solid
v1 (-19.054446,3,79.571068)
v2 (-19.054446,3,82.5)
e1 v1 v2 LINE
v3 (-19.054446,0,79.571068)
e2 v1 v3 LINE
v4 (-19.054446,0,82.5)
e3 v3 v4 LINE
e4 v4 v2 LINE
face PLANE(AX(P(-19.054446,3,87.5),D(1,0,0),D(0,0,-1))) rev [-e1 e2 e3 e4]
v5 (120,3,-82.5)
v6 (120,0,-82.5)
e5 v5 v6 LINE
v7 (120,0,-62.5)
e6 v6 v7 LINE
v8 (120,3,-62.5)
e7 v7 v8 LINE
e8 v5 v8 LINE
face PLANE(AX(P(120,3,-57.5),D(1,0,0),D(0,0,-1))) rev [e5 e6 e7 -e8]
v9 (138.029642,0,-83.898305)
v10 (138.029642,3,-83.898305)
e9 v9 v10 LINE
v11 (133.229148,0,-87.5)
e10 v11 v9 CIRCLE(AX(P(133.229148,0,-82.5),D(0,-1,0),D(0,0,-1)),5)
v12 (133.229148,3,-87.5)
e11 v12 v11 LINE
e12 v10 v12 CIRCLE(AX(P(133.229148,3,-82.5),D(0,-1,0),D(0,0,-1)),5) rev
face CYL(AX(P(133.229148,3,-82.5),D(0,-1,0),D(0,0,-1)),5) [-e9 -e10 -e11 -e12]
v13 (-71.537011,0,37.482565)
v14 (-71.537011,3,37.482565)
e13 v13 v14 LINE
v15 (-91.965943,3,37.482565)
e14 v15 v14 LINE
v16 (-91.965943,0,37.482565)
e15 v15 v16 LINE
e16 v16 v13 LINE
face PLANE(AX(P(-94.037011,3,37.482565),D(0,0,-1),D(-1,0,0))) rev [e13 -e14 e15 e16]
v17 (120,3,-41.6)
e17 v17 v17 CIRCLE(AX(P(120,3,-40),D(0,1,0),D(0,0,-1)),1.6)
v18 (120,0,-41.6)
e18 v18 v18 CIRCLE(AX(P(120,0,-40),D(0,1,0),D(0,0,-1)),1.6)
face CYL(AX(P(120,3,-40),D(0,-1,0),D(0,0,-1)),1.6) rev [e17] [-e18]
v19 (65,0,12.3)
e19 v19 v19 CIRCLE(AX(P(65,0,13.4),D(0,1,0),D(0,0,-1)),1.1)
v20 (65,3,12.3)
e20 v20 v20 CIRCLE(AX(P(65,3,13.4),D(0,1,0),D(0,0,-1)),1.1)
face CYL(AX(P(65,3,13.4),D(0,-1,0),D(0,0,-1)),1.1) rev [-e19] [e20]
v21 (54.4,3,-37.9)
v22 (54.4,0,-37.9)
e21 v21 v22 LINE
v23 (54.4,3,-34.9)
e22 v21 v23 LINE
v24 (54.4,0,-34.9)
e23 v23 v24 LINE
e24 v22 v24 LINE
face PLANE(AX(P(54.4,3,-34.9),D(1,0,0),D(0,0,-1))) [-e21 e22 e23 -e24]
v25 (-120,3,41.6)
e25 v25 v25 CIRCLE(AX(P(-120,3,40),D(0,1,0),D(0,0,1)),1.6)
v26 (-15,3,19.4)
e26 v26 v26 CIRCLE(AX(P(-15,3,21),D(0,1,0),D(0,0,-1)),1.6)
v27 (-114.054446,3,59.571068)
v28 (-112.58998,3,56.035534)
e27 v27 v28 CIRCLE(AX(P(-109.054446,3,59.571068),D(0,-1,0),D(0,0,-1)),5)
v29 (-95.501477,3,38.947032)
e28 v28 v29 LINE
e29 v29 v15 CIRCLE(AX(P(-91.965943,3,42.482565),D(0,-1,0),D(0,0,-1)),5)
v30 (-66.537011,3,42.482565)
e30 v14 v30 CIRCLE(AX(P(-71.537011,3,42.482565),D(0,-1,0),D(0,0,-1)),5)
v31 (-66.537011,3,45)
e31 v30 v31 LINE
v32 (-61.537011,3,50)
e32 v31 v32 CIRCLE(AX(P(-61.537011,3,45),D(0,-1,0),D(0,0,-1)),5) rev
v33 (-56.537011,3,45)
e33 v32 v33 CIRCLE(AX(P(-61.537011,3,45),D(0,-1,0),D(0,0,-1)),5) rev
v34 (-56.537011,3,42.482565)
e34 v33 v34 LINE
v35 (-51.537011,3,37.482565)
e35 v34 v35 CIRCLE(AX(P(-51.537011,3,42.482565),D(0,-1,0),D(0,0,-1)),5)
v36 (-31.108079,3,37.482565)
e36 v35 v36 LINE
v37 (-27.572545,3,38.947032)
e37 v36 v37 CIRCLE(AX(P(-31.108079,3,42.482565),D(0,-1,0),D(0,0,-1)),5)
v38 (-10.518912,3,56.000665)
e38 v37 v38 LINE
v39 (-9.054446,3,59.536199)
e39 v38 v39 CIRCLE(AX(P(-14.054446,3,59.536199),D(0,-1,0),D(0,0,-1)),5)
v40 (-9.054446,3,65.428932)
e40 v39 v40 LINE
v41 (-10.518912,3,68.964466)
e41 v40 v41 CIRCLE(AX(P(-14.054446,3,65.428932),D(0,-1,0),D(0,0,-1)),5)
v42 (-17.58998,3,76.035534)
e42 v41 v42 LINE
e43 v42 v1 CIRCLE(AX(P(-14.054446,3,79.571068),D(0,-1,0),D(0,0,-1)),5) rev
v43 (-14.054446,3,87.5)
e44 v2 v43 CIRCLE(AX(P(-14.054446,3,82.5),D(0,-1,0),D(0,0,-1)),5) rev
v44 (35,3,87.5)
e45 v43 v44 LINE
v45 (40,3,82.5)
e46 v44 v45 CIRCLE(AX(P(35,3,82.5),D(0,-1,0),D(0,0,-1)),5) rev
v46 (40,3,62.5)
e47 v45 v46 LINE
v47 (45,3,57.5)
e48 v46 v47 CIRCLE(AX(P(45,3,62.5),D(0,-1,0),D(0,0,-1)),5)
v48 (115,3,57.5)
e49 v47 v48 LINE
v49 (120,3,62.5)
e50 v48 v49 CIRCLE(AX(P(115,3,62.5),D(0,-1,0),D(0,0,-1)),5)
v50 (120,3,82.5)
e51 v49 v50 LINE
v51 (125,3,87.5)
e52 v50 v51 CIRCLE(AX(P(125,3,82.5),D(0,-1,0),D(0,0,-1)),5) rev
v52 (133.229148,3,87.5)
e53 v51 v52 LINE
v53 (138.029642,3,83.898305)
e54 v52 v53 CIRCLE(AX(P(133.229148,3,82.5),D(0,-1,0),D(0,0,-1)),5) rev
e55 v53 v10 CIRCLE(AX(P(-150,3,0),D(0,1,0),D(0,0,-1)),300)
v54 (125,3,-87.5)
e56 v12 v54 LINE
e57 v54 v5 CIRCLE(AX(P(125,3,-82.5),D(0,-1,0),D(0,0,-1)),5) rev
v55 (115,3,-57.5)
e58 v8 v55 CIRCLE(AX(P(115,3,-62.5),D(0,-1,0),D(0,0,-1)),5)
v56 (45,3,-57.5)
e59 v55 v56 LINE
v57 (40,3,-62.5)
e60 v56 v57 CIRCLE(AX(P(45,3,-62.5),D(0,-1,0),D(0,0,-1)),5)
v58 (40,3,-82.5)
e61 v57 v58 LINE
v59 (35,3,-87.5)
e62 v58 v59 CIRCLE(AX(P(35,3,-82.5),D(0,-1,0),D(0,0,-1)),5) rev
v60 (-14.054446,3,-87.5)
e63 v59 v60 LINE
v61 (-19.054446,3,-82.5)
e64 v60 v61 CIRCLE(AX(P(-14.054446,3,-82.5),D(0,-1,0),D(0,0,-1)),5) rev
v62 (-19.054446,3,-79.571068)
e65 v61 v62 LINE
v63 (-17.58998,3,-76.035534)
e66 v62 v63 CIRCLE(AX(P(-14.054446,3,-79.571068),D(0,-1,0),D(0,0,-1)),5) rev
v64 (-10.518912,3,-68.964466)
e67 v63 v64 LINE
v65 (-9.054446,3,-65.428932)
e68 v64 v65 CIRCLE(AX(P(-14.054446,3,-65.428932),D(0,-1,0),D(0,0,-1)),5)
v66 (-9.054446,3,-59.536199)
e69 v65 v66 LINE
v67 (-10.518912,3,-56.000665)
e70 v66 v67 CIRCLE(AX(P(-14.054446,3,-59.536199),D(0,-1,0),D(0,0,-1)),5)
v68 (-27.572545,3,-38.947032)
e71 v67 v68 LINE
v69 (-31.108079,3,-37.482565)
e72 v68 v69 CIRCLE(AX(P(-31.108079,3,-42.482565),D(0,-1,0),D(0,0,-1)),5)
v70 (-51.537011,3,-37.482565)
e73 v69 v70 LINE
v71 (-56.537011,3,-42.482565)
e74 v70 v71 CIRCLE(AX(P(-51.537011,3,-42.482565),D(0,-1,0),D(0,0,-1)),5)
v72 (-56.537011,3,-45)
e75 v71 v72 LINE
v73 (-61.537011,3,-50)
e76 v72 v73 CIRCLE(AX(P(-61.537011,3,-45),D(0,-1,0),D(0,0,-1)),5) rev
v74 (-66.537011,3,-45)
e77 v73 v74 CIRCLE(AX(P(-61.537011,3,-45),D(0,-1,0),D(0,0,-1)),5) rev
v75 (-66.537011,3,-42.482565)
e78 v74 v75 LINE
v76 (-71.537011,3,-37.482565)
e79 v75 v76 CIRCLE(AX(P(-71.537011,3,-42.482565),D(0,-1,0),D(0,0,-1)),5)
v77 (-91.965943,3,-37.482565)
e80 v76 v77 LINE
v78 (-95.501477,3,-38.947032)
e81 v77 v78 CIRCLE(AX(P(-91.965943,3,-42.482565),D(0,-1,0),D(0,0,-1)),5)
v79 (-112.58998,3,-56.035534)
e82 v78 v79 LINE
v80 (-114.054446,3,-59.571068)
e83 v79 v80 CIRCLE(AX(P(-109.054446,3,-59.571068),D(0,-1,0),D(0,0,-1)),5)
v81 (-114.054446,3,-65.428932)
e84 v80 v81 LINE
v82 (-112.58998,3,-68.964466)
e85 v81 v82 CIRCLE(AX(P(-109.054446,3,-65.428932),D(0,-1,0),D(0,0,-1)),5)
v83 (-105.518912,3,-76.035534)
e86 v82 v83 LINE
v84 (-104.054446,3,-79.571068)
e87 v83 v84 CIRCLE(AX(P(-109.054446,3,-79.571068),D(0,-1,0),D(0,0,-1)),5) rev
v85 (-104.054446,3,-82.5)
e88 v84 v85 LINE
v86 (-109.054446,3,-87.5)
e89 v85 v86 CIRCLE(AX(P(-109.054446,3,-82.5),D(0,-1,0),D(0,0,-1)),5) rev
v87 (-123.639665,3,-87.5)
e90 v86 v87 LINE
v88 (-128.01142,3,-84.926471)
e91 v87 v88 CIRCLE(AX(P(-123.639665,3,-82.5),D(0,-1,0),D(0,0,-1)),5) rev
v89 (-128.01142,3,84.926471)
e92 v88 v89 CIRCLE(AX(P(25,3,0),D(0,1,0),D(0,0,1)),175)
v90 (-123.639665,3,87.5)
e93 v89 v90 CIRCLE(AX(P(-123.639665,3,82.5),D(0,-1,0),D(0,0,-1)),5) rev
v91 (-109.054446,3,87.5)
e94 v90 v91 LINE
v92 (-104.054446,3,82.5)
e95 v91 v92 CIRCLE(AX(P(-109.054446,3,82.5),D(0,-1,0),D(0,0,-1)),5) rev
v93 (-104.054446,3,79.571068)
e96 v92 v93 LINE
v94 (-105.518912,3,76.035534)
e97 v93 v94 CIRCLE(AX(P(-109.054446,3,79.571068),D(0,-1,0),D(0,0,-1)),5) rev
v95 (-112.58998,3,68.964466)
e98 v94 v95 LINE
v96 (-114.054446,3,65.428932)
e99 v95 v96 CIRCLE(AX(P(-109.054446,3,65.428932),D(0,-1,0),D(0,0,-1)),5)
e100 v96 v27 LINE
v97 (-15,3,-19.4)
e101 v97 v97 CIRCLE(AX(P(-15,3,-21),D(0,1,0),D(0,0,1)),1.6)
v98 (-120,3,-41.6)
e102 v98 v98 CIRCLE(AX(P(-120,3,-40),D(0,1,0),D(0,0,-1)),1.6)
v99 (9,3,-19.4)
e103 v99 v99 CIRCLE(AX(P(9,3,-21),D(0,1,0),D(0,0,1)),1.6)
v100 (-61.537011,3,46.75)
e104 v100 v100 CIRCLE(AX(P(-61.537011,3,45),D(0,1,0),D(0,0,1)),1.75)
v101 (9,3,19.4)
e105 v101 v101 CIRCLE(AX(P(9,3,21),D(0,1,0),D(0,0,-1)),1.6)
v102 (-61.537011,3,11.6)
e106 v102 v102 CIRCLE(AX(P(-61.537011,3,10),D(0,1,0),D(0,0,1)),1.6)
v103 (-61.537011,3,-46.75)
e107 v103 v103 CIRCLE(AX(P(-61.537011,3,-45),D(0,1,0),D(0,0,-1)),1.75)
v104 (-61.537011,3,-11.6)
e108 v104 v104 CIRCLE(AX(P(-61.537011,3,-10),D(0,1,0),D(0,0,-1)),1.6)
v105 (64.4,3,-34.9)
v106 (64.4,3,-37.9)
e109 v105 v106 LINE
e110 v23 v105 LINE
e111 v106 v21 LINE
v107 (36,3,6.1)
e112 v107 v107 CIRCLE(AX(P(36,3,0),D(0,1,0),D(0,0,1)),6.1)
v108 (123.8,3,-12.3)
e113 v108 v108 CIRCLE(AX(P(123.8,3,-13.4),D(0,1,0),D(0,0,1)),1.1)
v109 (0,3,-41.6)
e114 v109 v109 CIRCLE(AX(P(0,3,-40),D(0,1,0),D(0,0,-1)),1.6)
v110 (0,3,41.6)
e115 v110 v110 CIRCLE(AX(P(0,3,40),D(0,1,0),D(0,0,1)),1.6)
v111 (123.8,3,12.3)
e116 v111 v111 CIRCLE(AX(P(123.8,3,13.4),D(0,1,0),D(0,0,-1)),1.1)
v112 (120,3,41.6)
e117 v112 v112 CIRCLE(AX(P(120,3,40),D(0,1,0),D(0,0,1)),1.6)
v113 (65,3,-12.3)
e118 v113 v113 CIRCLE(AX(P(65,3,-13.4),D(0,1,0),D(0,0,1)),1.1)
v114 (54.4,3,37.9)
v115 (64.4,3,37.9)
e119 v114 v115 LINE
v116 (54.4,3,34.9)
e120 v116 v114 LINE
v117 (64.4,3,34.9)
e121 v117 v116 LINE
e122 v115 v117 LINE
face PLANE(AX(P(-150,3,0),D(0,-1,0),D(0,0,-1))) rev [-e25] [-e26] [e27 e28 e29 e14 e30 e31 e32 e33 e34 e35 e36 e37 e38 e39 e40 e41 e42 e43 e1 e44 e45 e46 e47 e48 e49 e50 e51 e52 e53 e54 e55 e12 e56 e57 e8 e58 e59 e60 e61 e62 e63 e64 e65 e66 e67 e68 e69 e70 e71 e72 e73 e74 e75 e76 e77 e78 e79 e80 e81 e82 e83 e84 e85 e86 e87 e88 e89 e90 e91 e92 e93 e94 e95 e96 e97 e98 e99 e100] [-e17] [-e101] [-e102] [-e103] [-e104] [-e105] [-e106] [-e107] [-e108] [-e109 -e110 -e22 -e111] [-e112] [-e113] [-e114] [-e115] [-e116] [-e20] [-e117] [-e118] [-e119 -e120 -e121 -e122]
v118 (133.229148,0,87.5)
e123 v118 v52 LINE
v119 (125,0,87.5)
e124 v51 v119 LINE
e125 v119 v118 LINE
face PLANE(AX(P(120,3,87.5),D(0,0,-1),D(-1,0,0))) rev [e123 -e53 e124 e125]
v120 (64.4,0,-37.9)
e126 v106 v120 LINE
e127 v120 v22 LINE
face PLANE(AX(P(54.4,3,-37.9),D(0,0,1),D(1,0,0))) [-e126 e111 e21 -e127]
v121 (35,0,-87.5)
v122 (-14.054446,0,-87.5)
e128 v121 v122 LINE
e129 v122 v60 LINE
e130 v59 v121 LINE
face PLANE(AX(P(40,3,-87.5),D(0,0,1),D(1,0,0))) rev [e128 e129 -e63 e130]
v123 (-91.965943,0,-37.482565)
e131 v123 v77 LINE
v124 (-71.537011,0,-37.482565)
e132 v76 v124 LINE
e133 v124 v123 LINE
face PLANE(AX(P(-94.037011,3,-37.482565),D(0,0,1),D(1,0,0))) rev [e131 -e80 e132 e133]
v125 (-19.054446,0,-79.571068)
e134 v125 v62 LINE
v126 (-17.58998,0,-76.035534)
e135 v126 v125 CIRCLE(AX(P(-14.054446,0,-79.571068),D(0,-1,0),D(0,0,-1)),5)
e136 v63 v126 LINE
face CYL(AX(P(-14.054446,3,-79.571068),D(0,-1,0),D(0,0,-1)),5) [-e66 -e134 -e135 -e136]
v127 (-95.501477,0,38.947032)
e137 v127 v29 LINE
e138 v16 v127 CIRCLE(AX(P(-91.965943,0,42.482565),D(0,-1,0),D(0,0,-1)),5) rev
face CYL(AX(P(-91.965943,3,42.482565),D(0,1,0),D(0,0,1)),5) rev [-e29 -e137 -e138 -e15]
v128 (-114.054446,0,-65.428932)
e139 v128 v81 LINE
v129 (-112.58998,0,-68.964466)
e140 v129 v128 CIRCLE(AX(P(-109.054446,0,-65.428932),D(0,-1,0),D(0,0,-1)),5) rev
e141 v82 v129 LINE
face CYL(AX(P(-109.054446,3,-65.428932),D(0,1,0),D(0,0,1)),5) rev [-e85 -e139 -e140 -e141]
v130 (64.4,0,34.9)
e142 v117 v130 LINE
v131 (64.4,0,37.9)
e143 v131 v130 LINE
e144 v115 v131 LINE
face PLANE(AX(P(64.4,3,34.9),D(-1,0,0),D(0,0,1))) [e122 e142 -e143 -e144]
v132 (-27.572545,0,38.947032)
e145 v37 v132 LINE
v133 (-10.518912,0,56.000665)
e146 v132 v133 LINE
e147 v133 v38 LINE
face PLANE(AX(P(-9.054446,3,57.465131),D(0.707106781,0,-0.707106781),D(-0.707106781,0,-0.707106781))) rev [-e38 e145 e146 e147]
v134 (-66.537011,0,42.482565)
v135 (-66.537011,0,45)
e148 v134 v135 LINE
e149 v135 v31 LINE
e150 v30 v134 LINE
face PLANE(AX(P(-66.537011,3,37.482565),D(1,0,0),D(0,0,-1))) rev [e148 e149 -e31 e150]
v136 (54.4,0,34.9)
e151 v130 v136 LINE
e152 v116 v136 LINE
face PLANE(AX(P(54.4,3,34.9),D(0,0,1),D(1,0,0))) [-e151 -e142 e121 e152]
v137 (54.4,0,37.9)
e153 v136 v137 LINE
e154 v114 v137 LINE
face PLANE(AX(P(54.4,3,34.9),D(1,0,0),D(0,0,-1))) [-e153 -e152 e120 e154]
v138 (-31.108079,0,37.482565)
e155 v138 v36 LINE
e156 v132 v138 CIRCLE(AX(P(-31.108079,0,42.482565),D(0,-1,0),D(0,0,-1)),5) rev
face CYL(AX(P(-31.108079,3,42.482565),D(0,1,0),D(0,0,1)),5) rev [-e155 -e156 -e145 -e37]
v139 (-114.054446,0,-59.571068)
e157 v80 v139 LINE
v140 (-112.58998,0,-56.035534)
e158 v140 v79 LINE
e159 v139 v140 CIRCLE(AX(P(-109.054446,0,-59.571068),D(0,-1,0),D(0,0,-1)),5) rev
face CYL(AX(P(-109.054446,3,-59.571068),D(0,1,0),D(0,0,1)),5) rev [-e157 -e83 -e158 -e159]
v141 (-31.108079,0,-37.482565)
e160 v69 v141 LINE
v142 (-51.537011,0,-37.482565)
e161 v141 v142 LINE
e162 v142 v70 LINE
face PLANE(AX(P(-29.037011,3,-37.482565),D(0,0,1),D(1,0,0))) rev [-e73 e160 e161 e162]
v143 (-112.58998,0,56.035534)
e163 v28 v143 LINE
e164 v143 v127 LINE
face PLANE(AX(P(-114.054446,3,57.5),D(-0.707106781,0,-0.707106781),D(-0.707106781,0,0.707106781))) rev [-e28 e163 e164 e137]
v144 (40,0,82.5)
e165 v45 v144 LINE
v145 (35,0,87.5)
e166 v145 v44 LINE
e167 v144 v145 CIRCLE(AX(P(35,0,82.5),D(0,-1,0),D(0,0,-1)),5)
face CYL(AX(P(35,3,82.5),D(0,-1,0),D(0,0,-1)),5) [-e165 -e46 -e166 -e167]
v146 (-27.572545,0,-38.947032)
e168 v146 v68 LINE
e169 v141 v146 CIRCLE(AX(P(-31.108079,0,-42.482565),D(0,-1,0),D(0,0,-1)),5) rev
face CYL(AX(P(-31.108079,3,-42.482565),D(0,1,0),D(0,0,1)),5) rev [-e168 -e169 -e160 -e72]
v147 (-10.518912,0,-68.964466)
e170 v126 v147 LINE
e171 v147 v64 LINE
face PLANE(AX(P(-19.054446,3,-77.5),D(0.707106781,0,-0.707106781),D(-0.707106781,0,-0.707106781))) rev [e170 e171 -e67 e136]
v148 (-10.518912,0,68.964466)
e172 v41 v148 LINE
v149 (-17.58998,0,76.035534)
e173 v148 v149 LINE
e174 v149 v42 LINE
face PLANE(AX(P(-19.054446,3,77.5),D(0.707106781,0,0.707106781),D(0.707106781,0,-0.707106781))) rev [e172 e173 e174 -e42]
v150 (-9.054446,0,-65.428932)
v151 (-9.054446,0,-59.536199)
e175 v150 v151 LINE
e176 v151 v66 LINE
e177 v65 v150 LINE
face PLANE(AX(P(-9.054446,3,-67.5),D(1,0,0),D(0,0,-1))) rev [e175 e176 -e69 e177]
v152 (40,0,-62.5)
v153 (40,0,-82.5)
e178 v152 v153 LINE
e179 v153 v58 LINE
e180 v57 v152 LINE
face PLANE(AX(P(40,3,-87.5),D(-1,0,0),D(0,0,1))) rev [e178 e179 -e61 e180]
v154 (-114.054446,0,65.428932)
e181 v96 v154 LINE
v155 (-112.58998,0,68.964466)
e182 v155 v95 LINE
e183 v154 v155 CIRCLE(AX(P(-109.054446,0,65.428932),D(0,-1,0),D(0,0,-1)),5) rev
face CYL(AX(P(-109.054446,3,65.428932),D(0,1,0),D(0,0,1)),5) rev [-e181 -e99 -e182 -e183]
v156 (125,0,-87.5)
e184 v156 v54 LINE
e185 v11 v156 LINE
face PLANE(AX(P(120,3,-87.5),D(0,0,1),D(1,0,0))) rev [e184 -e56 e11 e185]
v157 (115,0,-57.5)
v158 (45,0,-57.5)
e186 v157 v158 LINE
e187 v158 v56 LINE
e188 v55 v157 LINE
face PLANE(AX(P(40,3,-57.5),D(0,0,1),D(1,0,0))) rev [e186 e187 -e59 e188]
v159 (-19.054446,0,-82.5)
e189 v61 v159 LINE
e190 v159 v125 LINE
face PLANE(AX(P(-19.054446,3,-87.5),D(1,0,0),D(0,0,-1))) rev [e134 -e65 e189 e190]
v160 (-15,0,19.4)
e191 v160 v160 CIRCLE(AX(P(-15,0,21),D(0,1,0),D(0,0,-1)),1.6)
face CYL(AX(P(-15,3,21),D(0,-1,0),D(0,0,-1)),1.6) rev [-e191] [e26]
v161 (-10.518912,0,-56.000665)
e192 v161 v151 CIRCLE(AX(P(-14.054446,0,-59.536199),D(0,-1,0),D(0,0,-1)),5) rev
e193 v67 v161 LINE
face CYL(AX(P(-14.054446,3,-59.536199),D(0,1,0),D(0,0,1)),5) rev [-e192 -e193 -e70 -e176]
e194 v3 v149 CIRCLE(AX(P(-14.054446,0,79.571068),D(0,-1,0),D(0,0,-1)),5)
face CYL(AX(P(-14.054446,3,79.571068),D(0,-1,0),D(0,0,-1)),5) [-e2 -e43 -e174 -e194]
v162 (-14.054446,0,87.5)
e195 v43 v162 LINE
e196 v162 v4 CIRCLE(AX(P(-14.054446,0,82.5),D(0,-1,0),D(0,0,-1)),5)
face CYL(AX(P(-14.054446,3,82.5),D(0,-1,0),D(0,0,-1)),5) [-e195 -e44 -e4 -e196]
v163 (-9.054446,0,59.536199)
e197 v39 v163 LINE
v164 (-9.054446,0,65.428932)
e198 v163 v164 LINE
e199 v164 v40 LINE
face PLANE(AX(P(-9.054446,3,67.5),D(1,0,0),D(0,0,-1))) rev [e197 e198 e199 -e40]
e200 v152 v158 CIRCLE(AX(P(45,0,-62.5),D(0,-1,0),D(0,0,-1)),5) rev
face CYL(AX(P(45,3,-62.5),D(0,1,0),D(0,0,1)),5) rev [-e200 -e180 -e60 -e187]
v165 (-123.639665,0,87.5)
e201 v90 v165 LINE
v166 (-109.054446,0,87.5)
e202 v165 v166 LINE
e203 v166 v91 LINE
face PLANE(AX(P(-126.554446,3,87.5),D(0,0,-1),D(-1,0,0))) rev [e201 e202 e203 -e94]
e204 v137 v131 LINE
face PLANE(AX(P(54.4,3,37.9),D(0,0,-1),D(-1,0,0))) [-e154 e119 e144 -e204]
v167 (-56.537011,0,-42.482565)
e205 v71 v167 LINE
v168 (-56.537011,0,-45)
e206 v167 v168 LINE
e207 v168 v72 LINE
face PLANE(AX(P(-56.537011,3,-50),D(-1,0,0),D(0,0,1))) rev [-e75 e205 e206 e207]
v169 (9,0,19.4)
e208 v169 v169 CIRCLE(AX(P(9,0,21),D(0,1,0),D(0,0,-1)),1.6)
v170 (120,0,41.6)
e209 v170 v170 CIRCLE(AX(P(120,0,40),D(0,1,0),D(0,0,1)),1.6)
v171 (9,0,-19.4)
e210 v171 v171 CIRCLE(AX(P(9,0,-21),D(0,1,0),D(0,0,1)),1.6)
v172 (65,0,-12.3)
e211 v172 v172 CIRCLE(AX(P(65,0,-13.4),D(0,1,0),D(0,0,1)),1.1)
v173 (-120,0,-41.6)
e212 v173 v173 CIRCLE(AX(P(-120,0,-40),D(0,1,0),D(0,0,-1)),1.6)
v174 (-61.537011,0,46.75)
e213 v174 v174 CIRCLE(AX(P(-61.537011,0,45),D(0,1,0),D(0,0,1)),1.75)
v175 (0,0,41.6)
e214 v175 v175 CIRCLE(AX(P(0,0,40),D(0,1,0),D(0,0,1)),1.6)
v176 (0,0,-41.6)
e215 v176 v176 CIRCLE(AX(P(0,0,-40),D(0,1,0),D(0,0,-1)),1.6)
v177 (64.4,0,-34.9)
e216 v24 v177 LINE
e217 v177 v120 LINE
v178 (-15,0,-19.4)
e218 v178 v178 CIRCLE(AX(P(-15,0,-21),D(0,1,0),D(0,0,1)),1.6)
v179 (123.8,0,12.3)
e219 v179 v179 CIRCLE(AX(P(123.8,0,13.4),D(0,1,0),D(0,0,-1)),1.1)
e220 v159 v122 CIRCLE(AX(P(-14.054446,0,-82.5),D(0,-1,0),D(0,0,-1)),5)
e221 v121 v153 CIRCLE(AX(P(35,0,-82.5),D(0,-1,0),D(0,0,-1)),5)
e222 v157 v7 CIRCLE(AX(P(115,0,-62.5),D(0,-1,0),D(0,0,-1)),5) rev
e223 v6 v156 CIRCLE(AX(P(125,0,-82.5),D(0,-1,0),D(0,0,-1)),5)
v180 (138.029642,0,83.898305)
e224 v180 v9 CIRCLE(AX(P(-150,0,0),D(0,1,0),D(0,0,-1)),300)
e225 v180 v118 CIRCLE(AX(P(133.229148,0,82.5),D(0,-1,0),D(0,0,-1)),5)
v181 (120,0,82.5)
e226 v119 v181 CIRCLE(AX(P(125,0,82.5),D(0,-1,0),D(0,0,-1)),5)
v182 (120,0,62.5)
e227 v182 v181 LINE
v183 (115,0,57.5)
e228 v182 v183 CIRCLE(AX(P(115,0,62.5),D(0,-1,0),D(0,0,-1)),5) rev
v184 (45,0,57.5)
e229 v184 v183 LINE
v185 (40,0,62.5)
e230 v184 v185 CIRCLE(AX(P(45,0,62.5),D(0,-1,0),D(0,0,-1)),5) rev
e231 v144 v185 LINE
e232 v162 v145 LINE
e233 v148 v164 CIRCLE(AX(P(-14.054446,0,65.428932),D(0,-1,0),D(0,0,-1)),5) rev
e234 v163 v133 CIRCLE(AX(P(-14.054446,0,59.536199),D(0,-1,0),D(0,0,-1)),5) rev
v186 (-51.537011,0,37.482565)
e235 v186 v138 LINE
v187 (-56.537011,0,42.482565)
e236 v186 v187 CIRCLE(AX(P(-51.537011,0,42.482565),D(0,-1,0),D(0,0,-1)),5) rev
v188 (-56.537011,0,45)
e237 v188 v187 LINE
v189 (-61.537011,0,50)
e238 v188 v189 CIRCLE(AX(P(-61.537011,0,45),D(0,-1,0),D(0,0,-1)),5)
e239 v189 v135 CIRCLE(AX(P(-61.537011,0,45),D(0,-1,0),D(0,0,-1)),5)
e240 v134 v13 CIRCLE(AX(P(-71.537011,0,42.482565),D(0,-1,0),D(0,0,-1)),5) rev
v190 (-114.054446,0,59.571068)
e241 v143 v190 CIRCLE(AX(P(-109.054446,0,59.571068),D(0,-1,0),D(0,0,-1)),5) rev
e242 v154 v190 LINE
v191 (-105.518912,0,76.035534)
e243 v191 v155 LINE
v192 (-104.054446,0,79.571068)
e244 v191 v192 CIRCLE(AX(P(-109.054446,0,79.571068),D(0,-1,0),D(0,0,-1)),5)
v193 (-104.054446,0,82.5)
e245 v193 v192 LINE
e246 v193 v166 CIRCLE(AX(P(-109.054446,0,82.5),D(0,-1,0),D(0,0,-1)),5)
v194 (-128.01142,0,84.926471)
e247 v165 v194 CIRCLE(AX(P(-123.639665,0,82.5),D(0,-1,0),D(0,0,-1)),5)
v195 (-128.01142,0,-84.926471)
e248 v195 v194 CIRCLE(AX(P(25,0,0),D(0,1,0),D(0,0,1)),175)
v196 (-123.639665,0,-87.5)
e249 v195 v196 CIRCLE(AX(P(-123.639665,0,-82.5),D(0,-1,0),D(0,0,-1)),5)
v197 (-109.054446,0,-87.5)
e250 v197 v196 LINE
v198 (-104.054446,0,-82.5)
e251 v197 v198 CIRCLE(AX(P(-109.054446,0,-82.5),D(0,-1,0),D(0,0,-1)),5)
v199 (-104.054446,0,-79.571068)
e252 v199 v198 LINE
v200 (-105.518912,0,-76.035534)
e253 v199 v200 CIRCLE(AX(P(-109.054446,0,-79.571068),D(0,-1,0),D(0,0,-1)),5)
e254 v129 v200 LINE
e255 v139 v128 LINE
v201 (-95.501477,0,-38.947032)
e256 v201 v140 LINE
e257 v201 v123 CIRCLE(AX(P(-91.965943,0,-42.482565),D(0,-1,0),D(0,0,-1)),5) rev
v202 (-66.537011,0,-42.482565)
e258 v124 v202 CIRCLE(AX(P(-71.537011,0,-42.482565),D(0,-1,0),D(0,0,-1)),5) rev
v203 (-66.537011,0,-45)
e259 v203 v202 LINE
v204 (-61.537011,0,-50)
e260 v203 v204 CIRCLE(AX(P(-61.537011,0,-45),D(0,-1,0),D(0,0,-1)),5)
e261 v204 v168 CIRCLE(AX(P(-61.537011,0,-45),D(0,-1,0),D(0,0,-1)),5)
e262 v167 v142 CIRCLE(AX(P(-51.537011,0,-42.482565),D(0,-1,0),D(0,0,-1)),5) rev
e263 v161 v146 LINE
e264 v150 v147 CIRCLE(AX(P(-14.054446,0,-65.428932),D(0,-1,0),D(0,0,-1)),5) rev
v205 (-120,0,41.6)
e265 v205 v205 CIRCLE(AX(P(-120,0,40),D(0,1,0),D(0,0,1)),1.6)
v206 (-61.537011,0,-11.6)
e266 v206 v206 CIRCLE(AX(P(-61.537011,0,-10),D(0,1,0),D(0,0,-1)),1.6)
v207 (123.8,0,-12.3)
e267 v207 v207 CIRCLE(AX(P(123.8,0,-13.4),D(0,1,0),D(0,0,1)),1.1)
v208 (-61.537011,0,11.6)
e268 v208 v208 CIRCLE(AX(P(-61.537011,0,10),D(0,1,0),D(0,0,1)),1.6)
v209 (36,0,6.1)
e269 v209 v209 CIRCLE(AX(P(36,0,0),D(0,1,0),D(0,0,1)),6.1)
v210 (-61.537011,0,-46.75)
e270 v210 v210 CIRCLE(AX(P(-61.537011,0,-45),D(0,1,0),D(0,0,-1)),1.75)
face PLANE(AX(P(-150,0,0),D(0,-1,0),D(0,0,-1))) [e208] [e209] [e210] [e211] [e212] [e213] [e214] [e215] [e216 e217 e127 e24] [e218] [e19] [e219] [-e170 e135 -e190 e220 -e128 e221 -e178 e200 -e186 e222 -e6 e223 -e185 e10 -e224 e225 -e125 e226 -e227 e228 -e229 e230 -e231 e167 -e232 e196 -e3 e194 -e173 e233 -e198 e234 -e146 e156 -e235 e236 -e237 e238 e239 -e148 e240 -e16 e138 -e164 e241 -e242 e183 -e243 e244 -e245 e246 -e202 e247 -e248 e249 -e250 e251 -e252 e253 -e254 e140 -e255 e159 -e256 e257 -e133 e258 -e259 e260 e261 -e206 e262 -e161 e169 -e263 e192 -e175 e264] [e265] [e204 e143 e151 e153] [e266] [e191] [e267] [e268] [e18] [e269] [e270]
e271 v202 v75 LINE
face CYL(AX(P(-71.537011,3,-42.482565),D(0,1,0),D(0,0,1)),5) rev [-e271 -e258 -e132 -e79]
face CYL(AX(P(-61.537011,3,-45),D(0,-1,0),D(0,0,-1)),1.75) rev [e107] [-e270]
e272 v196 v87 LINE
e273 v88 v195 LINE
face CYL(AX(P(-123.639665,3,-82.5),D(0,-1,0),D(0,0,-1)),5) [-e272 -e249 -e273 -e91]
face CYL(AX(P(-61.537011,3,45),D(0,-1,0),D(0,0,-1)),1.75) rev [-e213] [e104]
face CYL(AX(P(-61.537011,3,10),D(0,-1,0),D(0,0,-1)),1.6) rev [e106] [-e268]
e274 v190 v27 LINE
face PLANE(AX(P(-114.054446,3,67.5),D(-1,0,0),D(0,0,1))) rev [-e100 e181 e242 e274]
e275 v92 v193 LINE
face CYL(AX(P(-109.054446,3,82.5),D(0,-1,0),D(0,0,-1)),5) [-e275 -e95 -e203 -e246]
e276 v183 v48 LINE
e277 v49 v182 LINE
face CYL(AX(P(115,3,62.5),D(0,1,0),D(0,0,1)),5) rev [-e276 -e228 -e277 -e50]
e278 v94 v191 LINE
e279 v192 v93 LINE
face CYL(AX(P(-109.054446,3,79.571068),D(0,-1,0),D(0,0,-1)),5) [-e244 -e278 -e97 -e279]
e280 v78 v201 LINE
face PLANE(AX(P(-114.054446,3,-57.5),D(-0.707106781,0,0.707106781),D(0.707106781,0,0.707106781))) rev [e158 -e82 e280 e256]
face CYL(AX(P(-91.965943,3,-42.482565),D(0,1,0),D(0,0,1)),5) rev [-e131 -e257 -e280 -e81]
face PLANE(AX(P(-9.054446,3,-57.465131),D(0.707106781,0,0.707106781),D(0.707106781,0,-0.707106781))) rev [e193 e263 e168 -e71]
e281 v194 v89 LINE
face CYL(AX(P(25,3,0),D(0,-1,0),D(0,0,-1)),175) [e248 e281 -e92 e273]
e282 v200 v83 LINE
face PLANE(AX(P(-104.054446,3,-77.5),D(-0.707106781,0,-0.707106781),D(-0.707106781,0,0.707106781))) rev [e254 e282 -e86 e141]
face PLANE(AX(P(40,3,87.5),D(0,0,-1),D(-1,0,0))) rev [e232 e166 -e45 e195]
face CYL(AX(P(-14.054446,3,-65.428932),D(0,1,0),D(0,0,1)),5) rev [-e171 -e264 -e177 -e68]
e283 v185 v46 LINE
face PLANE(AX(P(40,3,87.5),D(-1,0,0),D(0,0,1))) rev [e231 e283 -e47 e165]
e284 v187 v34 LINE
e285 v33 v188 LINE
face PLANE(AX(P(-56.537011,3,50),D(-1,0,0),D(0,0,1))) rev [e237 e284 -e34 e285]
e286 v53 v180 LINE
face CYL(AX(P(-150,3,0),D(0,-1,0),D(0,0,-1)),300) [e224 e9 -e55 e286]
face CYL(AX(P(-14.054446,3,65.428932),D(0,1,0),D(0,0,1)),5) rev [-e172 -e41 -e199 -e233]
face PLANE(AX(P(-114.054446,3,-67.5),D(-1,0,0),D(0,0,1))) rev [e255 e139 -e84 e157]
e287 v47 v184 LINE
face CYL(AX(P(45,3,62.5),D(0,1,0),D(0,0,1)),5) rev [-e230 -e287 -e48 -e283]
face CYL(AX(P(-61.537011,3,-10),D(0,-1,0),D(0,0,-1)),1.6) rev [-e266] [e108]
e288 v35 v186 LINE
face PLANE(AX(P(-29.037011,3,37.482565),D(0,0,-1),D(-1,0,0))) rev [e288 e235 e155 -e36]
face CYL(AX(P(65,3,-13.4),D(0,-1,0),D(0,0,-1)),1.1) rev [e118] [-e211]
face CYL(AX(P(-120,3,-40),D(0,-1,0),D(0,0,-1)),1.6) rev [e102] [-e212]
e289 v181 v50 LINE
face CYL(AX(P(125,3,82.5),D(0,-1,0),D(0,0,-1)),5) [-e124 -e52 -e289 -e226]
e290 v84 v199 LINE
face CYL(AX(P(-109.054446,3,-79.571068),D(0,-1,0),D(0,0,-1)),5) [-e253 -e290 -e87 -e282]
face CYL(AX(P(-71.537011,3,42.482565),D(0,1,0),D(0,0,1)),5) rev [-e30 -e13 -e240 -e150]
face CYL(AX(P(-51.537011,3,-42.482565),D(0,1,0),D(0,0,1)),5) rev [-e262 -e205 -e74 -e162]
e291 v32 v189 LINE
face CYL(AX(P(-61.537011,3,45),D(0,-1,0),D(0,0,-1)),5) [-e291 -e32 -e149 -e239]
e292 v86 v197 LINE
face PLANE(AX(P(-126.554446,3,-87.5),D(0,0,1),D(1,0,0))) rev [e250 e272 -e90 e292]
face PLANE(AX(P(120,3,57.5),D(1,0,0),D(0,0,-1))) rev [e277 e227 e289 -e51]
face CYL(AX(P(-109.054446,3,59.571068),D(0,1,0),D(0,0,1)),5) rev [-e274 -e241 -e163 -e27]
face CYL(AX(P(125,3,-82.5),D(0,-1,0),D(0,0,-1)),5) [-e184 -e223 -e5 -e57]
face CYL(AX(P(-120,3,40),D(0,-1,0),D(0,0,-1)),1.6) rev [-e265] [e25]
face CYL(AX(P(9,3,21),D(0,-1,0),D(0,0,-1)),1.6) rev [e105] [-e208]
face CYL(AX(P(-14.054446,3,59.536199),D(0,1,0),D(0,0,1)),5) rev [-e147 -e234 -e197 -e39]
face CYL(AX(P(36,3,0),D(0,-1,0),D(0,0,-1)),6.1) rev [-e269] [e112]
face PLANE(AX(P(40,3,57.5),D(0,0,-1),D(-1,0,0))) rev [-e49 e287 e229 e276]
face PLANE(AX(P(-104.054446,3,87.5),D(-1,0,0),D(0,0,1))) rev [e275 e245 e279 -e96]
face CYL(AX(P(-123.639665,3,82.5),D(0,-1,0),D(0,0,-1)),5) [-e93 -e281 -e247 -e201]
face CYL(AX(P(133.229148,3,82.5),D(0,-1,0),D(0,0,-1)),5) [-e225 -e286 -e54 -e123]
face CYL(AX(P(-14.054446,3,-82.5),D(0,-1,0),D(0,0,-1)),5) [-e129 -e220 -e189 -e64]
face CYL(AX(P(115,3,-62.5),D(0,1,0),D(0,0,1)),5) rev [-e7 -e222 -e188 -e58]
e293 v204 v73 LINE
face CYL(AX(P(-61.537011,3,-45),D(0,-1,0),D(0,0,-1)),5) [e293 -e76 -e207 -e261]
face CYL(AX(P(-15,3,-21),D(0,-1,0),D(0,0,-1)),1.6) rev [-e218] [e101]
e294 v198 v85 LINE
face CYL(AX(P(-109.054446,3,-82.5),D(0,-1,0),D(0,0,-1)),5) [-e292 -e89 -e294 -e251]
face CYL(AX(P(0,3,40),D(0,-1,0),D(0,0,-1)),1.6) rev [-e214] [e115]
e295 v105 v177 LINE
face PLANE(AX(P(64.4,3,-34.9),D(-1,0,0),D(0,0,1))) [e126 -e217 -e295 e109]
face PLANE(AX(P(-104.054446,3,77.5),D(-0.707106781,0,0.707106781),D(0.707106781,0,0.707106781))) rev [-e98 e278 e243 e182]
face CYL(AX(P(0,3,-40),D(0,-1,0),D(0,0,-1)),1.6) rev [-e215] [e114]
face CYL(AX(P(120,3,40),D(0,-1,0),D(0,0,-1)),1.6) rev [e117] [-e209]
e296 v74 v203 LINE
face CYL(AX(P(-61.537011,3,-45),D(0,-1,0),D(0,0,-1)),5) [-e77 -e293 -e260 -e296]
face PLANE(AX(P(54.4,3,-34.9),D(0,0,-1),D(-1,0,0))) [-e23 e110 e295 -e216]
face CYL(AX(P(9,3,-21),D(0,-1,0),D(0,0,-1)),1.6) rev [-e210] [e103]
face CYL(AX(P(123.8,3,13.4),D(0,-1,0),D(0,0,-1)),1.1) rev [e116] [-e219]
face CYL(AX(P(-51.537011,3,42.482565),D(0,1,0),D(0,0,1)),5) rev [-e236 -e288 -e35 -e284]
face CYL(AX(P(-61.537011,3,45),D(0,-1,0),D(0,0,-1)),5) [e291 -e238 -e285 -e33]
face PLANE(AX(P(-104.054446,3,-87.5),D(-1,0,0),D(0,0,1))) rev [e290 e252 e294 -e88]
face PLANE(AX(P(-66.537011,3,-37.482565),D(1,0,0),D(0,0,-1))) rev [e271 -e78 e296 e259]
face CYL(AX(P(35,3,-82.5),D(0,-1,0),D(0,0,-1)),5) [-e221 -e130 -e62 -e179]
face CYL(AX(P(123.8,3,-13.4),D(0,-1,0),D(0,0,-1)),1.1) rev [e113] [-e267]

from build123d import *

# Parameters (mm, degrees)
SKETCH1_R           = 1.6
SKETCH1_R_2         = 1.1
SKETCH1_R_3         = 1.75
SKETCH1_R_4         = 6.1
SKETCH1_W           = 10
SKETCH1_H           = 3
BOSS_EXTRUDE1_DEPTH = 3
FILLET1_R           = 5


with BuildPart() as part:
    # Sketch1 → Boss-Extrude1 (new body)
    with BuildSketch(Plane(origin=(0, 0, 0), x_dir=(1, 0, 0), z_dir=(0, 1, 0))):
        with BuildLine():
            Line((40, 87.5), (40, 57.5))
            Line((40, 57.5), (120, 57.5))
            Line((120, 57.5), (120, 87.5))
            Line((120, 87.5), (136.956007081, 87.5))
            ThreePointArc((136.956007081, 87.5), (150, 0), (136.956007081, -87.5))
            Line((136.956007081, -87.5), (120, -87.5))
            Line((120, -87.5), (120, -57.5))
            Line((120, -57.5), (40, -57.5))
            Line((40, -57.5), (40, -87.5))
            Line((40, -87.5), (-19.054445662, -87.5))
            Line((-19.054445662, -87.5), (-19.054445662, -77.5))
            Line((-19.054445662, -77.5), (-9.054445662, -67.5))
            Line((-9.054445662, -67.5), (-9.054445662, -57.465130862))
            Line((-9.054445662, -57.465130862), (-29.037011093, -37.482565431))
            Line((-29.037011093, -37.482565431), (-56.537011093, -37.482565431))
            Line((-56.537011093, -37.482565431), (-56.537011093, -50))
            Line((-56.537011093, -50), (-66.537011093, -50))
            Line((-66.537011093, -50), (-66.537011093, -37.482565431))
            Line((-66.537011093, -37.482565431), (-94.037011093, -37.482565431))
            Line((-94.037011093, -37.482565431), (-114.054445662, -57.5))
            Line((-114.054445662, -57.5), (-114.054445662, -67.5))
            Line((-114.054445662, -67.5), (-104.054445662, -77.5))
            Line((-104.054445662, -77.5), (-104.054445662, -87.5))
            Line((-104.054445662, -87.5), (-126.554445662, -87.5))
            ThreePointArc((-126.554445662, -87.5), (-150, 0), (-126.554445662, 87.5))
            Line((-126.554445662, 87.5), (-104.054445662, 87.5))
            Line((-104.054445662, 87.5), (-104.054445662, 77.5))
            Line((-104.054445662, 77.5), (-114.054445662, 67.5))
            Line((-114.054445662, 67.5), (-114.054445662, 57.5))
            Line((-114.054445662, 57.5), (-94.037011093, 37.482565431))
            Line((-94.037011093, 37.482565431), (-66.537011093, 37.482565431))
            Line((-66.537011093, 37.482565431), (-66.537011093, 50))
            Line((-66.537011093, 50), (-56.537011093, 50))
            Line((-56.537011093, 50), (-56.537011093, 37.482565431))
            Line((-56.537011093, 37.482565431), (-29.037011093, 37.482565431))
            Line((-29.037011093, 37.482565431), (-9.054445662, 57.465130862))
            Line((-9.054445662, 57.465130862), (-9.054445662, 67.5))
            Line((-9.054445662, 67.5), (-19.054445662, 77.5))
            Line((-19.054445662, 77.5), (-19.054445662, 87.5))
            Line((-19.054445662, 87.5), (40, 87.5))
        make_face()
        with Locations(Location((-120, -40, 0), (0, 0, 270))):
            Circle(SKETCH1_R, mode=Mode.SUBTRACT)
        with Locations(Location((0, -40, 0), (0, 0, 270))):
            Circle(SKETCH1_R, mode=Mode.SUBTRACT)
        with Locations(Location((120, -40, 0), (0, 0, 270))):
            Circle(SKETCH1_R, mode=Mode.SUBTRACT)
        with Locations(Location((120, 40, 0), (0, 0, 90))):
            Circle(SKETCH1_R, mode=Mode.SUBTRACT)
        with Locations(Location((0, 40, 0), (0, 0, 90))):
            Circle(SKETCH1_R, mode=Mode.SUBTRACT)
        with Locations(Location((-120, 40, 0), (0, 0, 90))):
            Circle(SKETCH1_R, mode=Mode.SUBTRACT)
        with Locations(Location((-15, 21, 0), (0, 0, 270))):
            Circle(SKETCH1_R, mode=Mode.SUBTRACT)
        with Locations(Location((9, 21, 0), (0, 0, 270))):
            Circle(SKETCH1_R, mode=Mode.SUBTRACT)
        with Locations(Location((9, -21, 0), (0, 0, 90))):
            Circle(SKETCH1_R, mode=Mode.SUBTRACT)
        with Locations(Location((-15, -21, 0), (0, 0, 90))):
            Circle(SKETCH1_R, mode=Mode.SUBTRACT)
        with Locations(Location((123.8, 13.4, 0), (0, 0, 270))):
            Circle(SKETCH1_R_2, mode=Mode.SUBTRACT)
        with Locations(Location((65, 13.4, 0), (0, 0, 270))):
            Circle(SKETCH1_R_2, mode=Mode.SUBTRACT)
        with Locations(Location((65, -13.4, 0), (0, 0, 90))):
            Circle(SKETCH1_R_2, mode=Mode.SUBTRACT)
        with Locations(Location((123.8, -13.4, 0), (0, 0, 90))):
            Circle(SKETCH1_R_2, mode=Mode.SUBTRACT)
        with Locations(Location((-61.537011093, -45, 0), (0, 0, 270))):
            Circle(SKETCH1_R_3, mode=Mode.SUBTRACT)
        with Locations(Location((-61.537011093, 45, 0), (0, 0, 90))):
            Circle(SKETCH1_R_3, mode=Mode.SUBTRACT)
        with Locations(Location((-61.537011093, -10, 0), (0, 0, 270))):
            Circle(SKETCH1_R, mode=Mode.SUBTRACT)
        with Locations(Location((-61.537011093, 10, 0), (0, 0, 90))):
            Circle(SKETCH1_R, mode=Mode.SUBTRACT)
        with Locations(Location((36, 0, 0), (0, 0, 270))):
            Circle(SKETCH1_R_4, mode=Mode.SUBTRACT)
        with Locations((59.4, 36.4)):
            Rectangle(SKETCH1_W, SKETCH1_H, mode=Mode.SUBTRACT)
        with Locations((59.4, -36.4)):
            Rectangle(SKETCH1_W, SKETCH1_H, mode=Mode.SUBTRACT)
    extrude(amount=BOSS_EXTRUDE1_DEPTH)

    # Fillet1
    fillet1_edges = [part.edges().sort_by_distance(p)[0] for p in [
        (-104.054445662, 1.5, -87.5),
        (-104.054445662, 1.5, -77.5),
        (-114.054445662, 1.5, -67.5),
        (-114.054445662, 1.5, -57.5),
        (-9.054445662, 1.5, -57.465130862),
        (-9.054445662, 1.5, -67.5),
        (-19.054445662, 1.5, -77.5),
        (-19.054445662, 1.5, -87.5),
        (40, 1.5, -87.5),
        (40, 1.5, -57.5),
        (120, 1.5, -57.5),
        (120, 1.5, -87.5),
        (136.956007081, 1.5, -87.5),
        (136.956007081, 1.5, 87.5),
        (120, 1.5, 87.5),
        (120, 1.5, 57.5),
        (40, 1.5, 57.5),
        (40, 1.5, 87.5),
        (-19.054445662, 1.5, 87.5),
        (-19.054445662, 1.5, 77.5),
        (-9.054445662, 1.5, 67.5),
        (-9.054445662, 1.5, 57.465130862),
        (-114.054445662, 1.5, 57.5),
        (-114.054445662, 1.5, 67.5),
        (-104.054445662, 1.5, 77.5),
        (-104.054445662, 1.5, 87.5),
        (-126.554445662, 1.5, 87.5),
        (-126.554445662, 1.5, -87.5),
        (-56.537011093, 1.5, -50),
        (-94.037011093, 1.5, -37.482565431),
        (-29.037011093, 1.5, -37.482565431),
        (-66.537011093, 1.5, -50),
        (-29.037011093, 1.5, 37.482565431),
        (-94.037011093, 1.5, 37.482565431),
        (-56.537011093, 1.5, 50),
        (-66.537011093, 1.5, 50),
        (-66.537011093, 1.5, -37.482565431),
        (-56.537011093, 1.5, -37.482565431),
        (-66.537011093, 1.5, 37.482565431),
        (-56.537011093, 1.5, 37.482565431),
    ]]
    fillet(fillet1_edges, radius=FILLET1_R - 0.0001)  # a hair under: the kernel refuses the full size


solid = part.part
